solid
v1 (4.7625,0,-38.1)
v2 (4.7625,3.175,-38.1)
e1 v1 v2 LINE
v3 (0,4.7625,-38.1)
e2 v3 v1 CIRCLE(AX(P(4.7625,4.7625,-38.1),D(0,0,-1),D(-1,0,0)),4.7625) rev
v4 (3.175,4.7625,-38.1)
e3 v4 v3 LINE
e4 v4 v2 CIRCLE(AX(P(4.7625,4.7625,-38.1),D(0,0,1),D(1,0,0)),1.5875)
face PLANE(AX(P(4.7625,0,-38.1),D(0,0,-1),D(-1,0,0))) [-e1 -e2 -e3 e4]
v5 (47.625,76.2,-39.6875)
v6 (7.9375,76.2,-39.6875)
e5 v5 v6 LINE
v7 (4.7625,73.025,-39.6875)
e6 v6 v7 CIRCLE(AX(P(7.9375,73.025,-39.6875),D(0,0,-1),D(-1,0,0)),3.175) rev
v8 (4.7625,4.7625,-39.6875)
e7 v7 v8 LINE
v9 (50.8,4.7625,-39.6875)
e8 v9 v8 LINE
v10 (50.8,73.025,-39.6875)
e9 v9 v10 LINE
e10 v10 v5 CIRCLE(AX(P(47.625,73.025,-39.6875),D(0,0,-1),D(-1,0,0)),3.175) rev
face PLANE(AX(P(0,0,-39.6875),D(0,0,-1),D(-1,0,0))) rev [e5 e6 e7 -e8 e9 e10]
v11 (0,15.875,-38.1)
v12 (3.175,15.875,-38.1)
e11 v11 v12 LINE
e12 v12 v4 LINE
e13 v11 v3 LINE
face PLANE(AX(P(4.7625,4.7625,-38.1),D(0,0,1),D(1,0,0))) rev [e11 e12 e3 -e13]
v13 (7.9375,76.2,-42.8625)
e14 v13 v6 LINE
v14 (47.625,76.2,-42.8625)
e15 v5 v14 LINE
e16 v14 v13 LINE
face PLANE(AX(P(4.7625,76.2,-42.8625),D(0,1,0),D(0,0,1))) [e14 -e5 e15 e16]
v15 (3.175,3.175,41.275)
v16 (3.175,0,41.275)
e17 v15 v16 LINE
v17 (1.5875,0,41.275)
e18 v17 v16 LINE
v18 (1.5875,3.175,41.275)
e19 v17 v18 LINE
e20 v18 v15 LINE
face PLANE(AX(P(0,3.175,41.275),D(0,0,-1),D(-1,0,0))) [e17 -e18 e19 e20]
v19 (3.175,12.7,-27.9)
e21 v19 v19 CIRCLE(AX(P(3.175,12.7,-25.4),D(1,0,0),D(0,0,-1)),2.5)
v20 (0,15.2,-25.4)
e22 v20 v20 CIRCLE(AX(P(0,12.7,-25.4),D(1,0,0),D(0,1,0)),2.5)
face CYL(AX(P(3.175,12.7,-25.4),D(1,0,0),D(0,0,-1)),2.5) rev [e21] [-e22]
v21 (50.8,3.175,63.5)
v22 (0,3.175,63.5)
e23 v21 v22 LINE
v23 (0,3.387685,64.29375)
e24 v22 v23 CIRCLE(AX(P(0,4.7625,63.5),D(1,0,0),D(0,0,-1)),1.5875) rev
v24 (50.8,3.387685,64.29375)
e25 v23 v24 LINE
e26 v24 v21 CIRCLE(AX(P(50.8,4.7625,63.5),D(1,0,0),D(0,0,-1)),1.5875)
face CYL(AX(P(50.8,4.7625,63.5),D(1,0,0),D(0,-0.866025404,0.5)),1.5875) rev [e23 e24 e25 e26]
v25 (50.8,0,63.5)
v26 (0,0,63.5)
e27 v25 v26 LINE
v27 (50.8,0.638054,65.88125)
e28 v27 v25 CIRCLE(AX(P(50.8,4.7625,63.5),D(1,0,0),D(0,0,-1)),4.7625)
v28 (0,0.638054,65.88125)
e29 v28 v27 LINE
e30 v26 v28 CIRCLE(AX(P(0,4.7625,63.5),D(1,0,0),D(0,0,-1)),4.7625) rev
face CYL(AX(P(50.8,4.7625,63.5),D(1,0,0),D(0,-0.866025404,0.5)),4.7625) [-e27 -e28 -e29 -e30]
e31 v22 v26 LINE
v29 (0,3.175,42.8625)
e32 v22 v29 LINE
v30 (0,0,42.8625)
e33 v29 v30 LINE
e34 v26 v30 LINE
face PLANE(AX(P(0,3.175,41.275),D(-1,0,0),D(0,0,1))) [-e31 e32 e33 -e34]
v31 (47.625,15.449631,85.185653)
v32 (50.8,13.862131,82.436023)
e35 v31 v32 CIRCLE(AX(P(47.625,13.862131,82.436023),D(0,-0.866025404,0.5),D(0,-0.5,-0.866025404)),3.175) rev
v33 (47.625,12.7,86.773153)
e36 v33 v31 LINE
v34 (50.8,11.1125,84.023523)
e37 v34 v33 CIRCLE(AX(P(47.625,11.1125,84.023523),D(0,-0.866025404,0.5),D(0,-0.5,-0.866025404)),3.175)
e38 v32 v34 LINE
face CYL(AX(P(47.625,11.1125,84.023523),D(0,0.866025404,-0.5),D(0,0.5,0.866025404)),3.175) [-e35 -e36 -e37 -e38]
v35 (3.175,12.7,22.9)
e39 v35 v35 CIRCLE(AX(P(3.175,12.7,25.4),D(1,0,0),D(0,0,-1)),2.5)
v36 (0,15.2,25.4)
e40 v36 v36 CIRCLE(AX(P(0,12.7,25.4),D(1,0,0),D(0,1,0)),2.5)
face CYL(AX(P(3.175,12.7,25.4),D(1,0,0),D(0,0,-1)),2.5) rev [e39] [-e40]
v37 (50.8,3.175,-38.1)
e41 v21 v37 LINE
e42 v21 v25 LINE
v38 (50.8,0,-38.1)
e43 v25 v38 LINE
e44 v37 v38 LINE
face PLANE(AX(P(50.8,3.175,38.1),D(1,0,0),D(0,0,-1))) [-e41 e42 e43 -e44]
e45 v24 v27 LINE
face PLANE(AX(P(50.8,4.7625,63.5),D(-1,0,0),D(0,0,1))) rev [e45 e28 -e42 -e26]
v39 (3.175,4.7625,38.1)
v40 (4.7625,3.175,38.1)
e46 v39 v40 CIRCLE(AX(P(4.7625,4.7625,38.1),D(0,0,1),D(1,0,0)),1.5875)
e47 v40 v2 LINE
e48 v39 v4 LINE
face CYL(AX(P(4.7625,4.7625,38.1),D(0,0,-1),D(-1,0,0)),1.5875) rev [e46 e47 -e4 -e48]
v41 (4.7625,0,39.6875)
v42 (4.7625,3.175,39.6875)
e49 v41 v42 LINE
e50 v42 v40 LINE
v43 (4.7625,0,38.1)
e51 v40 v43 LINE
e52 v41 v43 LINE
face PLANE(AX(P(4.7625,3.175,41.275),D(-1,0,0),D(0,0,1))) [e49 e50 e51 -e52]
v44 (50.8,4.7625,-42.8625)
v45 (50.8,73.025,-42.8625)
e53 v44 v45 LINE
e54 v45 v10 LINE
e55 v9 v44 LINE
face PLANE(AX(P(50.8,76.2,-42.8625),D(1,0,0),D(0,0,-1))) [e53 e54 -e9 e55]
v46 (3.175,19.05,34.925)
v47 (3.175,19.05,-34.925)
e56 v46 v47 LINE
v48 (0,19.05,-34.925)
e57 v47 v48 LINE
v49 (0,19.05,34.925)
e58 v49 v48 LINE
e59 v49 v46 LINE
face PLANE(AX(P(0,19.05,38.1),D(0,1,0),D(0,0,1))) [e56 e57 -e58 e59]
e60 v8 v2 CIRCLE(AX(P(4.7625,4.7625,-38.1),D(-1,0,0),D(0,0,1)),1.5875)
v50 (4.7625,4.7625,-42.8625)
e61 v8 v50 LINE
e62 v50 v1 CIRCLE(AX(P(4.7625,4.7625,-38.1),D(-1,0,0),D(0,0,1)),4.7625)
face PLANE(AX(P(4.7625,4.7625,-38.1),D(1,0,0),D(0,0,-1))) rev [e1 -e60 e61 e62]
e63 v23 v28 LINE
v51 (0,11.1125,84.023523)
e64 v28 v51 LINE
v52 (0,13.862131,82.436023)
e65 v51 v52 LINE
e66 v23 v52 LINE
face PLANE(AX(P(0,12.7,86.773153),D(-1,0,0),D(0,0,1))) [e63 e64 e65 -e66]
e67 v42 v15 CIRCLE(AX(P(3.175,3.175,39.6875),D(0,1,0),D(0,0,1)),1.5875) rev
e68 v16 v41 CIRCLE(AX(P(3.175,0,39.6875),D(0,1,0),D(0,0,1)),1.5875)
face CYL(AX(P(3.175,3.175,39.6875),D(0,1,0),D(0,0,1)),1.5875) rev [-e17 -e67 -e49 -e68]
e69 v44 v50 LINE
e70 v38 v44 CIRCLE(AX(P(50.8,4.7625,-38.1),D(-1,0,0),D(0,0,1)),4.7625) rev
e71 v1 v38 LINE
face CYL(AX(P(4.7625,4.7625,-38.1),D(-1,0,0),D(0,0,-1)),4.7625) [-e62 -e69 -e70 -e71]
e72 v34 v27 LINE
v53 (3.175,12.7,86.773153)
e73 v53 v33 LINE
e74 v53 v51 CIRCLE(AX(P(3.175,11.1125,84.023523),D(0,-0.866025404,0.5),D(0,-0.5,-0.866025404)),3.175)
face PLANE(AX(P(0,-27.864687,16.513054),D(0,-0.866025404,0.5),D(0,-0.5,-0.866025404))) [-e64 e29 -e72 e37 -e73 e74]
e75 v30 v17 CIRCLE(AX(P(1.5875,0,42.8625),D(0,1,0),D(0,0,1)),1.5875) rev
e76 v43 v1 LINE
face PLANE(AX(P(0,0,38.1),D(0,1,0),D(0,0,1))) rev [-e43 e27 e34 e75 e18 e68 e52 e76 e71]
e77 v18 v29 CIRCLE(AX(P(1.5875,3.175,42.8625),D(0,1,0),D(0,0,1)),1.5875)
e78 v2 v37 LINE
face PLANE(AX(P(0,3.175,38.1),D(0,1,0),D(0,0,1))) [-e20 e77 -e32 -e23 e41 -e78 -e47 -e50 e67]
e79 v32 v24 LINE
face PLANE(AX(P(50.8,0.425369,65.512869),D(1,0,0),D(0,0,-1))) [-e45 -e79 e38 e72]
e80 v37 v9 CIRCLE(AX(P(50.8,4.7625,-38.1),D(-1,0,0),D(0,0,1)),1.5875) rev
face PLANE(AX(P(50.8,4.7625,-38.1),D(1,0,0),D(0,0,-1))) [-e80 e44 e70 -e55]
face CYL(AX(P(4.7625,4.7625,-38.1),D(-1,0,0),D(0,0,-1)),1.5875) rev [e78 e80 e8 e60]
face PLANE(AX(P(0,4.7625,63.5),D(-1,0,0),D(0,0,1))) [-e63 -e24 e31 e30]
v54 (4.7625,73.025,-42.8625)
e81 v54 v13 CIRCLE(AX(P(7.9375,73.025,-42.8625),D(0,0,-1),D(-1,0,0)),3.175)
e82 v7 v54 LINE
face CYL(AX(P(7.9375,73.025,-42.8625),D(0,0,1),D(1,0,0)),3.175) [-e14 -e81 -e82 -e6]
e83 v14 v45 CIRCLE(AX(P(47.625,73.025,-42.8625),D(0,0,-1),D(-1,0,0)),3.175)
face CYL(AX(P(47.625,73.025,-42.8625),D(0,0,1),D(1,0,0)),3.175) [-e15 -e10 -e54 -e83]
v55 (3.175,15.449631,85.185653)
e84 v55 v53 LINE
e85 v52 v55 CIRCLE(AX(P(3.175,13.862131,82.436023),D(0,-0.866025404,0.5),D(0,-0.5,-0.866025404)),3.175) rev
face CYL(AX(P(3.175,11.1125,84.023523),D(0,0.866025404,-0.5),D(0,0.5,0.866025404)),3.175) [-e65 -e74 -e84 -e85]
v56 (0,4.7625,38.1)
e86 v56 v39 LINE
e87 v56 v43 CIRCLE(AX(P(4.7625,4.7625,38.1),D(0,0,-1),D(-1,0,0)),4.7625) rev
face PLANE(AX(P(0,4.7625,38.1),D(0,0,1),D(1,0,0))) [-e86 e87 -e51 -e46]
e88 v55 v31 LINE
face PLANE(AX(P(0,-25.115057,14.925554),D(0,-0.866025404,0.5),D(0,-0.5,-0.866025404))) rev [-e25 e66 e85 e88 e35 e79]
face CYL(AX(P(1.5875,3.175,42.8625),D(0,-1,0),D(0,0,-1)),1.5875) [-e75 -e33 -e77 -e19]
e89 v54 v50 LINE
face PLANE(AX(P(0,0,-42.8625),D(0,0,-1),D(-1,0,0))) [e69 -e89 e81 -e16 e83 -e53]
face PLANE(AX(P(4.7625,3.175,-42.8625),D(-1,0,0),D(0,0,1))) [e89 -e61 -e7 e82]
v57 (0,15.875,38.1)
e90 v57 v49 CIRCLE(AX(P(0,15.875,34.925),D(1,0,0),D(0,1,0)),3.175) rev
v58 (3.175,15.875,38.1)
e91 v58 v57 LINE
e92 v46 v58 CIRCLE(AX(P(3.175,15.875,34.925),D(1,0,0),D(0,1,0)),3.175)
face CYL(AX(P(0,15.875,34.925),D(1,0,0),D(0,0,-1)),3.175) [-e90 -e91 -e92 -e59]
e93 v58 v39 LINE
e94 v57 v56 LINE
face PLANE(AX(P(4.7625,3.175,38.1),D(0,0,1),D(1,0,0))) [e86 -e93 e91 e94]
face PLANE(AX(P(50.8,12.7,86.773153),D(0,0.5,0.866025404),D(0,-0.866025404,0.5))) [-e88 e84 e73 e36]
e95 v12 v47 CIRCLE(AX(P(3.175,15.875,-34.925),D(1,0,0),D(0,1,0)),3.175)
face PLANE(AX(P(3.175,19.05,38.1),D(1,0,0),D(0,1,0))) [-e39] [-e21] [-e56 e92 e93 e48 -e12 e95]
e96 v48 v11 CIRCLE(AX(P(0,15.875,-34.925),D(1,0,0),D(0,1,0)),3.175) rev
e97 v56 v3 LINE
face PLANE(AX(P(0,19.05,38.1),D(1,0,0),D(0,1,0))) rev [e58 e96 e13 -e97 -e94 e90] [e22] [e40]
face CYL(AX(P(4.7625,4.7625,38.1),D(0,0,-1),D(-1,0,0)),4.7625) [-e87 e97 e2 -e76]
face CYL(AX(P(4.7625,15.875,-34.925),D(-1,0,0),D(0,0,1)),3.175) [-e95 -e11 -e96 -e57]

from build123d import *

# Parameters (mm, degrees)
BASE_FLANGE1_DEPTH    = 38.1
TAB1_DEPTH            = 3.175
EDGE_FLANGE1_DEPTH    = 50.8
FILLET2_R             = 1.5875
M6X1_0_TAPPED_HOLE1_D = 5
EDGE_FLANGE2_DEPTH    = 46.0375
FILLET1_R             = 3.175


# Sheet-metal steps are written as plain solids
with BuildPart() as part:
    # Sketch1 → Base-Flange1 (new, symmetric)
    with BuildSketch(Plane.XY):
        with BuildLine():
            Line((0, 19.05), (0, 4.7625))
            ThreePointArc((0, 4.7625), (1.394903955, 1.394903955), (4.7625, 0))
            Line((4.7625, 0), (50.8, 0))
            Line((50.8, 0), (50.8, 3.175))
            Line((50.8, 3.175), (4.7625, 3.175))
            ThreePointArc((4.7625, 3.175), (3.639967985, 3.639967985), (3.175, 4.7625))
            Line((3.175, 4.7625), (3.175, 19.05))
            Line((3.175, 19.05), (0, 19.05))
        make_face()
    extrude(amount=BASE_FLANGE1_DEPTH, both=True)

    # Sketch2 → Tab1 (add)
    with BuildSketch(Plane.XZ):
        Polygon((50.8, 38.1), (4.7625, 38.1), (4.7625, 41.275), (0, 41.275), (0, 63.5), (50.8, 63.5), align=None)
    extrude(amount=-TAB1_DEPTH)

    # Edge-Flange1 section (across the edge) → Edge-Flange1 (add)
    with BuildSketch(Plane(origin=(0, 3.175, 63.925369343), x_dir=(0, 0.8660254037844416, -0.49999999999999495), z_dir=(1, 0, 0))):
        with BuildLine():
            Line((-3.175, 0.425369343), (-3.175, 24.549261314))
            Line((-3.175, 24.549261314), (0, 24.549261314))
            Line((0, 24.549261314), (0, 0.425369343))
            ThreePointArc((0, 0.425369343), (0.054092751, 0.014494109), (0.212684671, -0.368380657))
            Line((0.212684671, -0.368380657), (-2.536945986, -1.955880657))
            ThreePointArc((-2.536945986, -1.955880657), (-3.012721748, -0.807256359), (-3.175, 0.425369343))
        make_face()
    extrude(amount=EDGE_FLANGE1_DEPTH)

    # Fillet2
    fillet2_edges = [part.edges().sort_by_distance(p)[0] for p in [
        (4.7625, 1.5875, 41.275),
        (0, 1.5875, 41.275),
    ]]
    fillet(fillet2_edges, radius=FILLET2_R)

    # M6x1.0 Tapped Hole1 (through all)
    with Locations(Plane(origin=(3.175, 0, 0), x_dir=(0, 0, -1), z_dir=(1, 0, 0))):
        with Locations((-25.4, 12.7), (25.4, 12.7)):
            Hole(M6X1_0_TAPPED_HOLE1_D / 2)

    # Edge-Flange2 section (across the edge) → Edge-Flange2 (add)
    with BuildSketch(Plane(origin=(50.8, 3.175, -39.6875), x_dir=(0, 0, 1), z_dir=(-1, 0, 0))):
        with BuildLine():
            Line((-3.175, 1.5875), (-3.175, 73.025))
            Line((-3.175, 73.025), (0, 73.025))
            Line((0, 73.025), (0, 1.5875))
            ThreePointArc((0, 1.5875), (0.464967985, 0.464967985), (1.5875, 0))
            Line((1.5875, 0), (1.5875, -3.175))
            ThreePointArc((1.5875, -3.175), (-1.780096045, -1.780096045), (-3.175, 1.5875))
        make_face()
    extrude(amount=EDGE_FLANGE2_DEPTH)

    # Fillet1
    fillet1_edges = [part.edges().sort_by_distance(p)[0] for p in [
        (4.7625, 76.2, -41.275),
        (1.5875, 19.05, 38.1),
        (0, 14.074815329, 85.979403285),
        (50.8, 14.074815329, 85.979403285),
        (1.5875, 19.05, -38.1),
        (50.8, 76.2, -41.275),
    ]]
    fillet(fillet1_edges, radius=FILLET1_R)


solid = part.part
